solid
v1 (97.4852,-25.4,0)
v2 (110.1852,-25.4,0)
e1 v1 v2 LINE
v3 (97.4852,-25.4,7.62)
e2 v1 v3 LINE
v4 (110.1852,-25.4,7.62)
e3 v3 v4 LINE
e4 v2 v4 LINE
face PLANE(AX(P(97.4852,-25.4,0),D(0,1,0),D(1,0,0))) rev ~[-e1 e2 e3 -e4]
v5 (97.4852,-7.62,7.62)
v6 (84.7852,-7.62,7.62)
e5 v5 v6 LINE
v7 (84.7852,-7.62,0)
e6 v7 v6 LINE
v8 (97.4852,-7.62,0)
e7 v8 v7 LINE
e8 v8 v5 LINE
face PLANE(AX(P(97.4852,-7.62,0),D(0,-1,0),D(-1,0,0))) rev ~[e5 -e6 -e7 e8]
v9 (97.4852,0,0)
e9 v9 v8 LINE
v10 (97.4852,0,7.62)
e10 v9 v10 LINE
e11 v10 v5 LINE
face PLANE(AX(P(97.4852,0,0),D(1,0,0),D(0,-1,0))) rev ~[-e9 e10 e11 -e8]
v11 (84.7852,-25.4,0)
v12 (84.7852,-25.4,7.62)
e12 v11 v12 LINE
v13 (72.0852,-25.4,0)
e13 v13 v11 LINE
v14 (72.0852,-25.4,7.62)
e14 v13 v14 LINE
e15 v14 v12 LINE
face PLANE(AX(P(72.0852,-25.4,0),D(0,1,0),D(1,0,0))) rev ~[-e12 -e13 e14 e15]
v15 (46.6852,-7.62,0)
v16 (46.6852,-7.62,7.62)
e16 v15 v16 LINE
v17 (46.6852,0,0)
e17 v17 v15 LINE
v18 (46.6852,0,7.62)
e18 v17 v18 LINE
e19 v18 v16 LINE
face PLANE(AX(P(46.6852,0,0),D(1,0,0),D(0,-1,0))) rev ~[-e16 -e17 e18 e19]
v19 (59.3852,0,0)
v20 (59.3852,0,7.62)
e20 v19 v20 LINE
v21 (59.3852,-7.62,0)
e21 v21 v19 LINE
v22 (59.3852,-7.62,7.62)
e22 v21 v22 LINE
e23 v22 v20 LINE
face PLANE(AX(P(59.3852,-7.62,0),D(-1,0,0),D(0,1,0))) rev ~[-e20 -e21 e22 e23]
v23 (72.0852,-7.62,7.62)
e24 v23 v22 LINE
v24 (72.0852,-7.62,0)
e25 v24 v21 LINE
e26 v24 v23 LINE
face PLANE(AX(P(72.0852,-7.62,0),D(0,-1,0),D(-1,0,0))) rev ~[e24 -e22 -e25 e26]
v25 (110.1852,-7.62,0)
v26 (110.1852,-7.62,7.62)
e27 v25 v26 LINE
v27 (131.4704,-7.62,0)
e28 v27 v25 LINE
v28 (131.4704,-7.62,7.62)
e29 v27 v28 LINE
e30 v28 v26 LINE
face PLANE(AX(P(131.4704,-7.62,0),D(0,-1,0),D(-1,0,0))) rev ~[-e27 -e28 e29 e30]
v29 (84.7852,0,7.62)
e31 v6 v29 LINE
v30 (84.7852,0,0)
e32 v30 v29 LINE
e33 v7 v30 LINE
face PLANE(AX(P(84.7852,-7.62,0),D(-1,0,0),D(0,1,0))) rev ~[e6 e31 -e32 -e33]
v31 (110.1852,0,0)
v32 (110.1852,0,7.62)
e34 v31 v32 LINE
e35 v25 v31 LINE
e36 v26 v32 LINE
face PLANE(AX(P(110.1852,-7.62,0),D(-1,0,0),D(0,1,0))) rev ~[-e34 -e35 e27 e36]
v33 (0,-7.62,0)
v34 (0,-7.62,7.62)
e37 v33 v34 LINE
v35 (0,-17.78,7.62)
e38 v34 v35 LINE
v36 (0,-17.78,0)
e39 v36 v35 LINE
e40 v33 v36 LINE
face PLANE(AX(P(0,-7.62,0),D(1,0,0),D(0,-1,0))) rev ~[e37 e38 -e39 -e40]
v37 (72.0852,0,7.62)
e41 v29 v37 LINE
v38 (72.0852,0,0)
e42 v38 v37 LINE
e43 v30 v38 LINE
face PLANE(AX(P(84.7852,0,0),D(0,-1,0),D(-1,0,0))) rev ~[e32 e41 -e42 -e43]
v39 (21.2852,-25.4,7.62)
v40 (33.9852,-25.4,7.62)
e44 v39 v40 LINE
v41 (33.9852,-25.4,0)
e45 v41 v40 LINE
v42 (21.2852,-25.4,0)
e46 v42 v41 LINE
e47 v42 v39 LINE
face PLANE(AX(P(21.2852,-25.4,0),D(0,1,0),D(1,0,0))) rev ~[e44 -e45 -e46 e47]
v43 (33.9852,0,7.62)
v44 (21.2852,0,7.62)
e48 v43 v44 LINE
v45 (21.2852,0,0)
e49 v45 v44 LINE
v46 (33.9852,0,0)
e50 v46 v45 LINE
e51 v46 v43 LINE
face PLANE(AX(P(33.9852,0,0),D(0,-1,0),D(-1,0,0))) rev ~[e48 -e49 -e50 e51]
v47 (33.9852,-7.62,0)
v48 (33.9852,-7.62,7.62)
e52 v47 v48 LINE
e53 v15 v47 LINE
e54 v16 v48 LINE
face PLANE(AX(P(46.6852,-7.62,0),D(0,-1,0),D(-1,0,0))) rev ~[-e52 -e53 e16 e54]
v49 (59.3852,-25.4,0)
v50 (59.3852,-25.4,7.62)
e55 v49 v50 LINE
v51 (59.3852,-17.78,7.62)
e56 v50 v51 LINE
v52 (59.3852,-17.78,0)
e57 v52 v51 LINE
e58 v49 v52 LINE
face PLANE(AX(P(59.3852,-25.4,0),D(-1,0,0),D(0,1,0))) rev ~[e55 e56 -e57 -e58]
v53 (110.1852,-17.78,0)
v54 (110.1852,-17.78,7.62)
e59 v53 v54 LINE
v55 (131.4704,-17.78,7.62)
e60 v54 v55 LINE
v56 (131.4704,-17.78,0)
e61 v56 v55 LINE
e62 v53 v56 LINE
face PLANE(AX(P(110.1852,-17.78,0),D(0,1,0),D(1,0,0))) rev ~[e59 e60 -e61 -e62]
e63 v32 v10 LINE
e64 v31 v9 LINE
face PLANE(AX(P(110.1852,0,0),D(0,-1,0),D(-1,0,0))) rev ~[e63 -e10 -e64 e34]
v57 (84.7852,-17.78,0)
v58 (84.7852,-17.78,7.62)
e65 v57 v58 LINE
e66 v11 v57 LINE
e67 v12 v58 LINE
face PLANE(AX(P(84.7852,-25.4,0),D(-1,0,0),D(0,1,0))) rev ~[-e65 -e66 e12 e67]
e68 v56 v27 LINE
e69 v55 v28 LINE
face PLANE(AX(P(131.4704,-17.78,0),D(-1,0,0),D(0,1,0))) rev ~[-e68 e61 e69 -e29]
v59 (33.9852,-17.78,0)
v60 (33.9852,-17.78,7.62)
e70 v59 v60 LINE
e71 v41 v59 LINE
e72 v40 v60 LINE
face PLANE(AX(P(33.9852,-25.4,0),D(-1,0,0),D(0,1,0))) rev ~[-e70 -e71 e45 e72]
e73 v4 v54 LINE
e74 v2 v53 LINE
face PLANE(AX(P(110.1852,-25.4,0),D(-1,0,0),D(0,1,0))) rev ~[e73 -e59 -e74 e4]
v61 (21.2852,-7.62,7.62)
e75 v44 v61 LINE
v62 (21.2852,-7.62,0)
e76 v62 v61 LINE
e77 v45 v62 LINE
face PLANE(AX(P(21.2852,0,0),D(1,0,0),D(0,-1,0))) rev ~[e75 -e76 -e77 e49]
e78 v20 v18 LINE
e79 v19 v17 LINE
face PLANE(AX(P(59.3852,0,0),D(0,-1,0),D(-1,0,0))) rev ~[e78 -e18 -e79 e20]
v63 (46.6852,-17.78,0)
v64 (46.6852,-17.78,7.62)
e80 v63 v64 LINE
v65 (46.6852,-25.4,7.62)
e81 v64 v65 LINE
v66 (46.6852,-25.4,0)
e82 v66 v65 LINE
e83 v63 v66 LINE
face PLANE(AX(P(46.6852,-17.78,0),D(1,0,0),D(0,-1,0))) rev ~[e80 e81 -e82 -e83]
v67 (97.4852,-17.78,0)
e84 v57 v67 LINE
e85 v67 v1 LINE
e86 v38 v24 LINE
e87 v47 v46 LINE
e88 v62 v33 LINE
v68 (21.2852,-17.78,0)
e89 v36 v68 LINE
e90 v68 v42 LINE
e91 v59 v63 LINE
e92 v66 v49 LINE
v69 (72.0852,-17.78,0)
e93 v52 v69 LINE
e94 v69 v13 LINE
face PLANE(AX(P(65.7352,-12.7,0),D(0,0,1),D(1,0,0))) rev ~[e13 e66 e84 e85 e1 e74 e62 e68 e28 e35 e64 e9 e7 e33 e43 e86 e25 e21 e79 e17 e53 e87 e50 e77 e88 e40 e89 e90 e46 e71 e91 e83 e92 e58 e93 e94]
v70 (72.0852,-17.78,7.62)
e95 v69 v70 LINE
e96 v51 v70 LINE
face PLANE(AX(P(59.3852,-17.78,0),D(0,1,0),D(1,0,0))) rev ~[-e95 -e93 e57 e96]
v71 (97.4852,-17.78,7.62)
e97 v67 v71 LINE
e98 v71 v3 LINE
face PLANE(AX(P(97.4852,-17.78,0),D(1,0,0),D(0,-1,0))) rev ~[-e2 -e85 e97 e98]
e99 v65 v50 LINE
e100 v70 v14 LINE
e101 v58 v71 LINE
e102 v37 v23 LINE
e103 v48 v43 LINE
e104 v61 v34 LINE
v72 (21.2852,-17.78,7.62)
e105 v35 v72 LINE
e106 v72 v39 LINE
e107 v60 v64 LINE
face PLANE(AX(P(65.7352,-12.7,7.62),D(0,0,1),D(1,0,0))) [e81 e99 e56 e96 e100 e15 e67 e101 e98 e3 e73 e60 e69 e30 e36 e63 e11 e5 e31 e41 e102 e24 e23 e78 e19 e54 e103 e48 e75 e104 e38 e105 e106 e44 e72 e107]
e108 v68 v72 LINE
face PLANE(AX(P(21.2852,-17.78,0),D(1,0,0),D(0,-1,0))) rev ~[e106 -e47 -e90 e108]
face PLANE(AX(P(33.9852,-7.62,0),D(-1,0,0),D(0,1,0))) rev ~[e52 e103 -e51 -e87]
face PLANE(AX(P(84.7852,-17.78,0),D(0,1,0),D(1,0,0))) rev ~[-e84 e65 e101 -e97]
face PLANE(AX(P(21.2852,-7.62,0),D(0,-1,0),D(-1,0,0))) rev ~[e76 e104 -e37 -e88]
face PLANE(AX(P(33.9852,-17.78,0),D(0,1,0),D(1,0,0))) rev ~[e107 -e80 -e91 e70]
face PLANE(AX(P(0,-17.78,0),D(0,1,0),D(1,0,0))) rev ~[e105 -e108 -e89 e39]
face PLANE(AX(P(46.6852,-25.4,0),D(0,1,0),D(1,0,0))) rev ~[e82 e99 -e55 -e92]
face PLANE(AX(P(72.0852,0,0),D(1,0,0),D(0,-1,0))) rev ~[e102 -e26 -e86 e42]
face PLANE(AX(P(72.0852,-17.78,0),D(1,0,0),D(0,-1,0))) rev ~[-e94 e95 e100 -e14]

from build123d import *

# Parameters (mm, degrees)
F1_DEPTH = 7.62


# Not quite as in the source:
# - a feature names something its author has since deleted; it is built from what else it names


with BuildPart() as f1:
    # F0 (on Top) → F1 (new body)
    with BuildSketch(Plane.XY):
        Polygon((21.2852, -17.78), (21.2852, -25.4), (33.9852, -25.4), (33.9852, -17.78), (46.6852, -17.78), (46.6852, -25.4), (59.3852, -25.4), (59.3852, -17.78), (72.0852, -17.78), (72.0852, -25.4), (84.7852, -25.4), (84.7852, -17.78), (97.4852, -17.78), (97.4852, -25.4), (110.1852, -25.4), (110.1852, -17.78), (131.4704, -17.78), (131.4704, -7.62), (110.1852, -7.62), (110.1852, 0), (97.4852, 0), (97.4852, -7.62), (84.7852, -7.62), (84.7852, 0), (72.0852, 0), (72.0852, -7.62), (59.3852, -7.62), (59.3852, 0), (46.6852, 0), (46.6852, -7.62), (33.9852, -7.62), (33.9852, 0), (21.2852, 0), (21.2852, -7.62), (0, -7.62), (0, -17.78), align=None)
    extrude(amount=F1_DEPTH)


solid = f1.part
